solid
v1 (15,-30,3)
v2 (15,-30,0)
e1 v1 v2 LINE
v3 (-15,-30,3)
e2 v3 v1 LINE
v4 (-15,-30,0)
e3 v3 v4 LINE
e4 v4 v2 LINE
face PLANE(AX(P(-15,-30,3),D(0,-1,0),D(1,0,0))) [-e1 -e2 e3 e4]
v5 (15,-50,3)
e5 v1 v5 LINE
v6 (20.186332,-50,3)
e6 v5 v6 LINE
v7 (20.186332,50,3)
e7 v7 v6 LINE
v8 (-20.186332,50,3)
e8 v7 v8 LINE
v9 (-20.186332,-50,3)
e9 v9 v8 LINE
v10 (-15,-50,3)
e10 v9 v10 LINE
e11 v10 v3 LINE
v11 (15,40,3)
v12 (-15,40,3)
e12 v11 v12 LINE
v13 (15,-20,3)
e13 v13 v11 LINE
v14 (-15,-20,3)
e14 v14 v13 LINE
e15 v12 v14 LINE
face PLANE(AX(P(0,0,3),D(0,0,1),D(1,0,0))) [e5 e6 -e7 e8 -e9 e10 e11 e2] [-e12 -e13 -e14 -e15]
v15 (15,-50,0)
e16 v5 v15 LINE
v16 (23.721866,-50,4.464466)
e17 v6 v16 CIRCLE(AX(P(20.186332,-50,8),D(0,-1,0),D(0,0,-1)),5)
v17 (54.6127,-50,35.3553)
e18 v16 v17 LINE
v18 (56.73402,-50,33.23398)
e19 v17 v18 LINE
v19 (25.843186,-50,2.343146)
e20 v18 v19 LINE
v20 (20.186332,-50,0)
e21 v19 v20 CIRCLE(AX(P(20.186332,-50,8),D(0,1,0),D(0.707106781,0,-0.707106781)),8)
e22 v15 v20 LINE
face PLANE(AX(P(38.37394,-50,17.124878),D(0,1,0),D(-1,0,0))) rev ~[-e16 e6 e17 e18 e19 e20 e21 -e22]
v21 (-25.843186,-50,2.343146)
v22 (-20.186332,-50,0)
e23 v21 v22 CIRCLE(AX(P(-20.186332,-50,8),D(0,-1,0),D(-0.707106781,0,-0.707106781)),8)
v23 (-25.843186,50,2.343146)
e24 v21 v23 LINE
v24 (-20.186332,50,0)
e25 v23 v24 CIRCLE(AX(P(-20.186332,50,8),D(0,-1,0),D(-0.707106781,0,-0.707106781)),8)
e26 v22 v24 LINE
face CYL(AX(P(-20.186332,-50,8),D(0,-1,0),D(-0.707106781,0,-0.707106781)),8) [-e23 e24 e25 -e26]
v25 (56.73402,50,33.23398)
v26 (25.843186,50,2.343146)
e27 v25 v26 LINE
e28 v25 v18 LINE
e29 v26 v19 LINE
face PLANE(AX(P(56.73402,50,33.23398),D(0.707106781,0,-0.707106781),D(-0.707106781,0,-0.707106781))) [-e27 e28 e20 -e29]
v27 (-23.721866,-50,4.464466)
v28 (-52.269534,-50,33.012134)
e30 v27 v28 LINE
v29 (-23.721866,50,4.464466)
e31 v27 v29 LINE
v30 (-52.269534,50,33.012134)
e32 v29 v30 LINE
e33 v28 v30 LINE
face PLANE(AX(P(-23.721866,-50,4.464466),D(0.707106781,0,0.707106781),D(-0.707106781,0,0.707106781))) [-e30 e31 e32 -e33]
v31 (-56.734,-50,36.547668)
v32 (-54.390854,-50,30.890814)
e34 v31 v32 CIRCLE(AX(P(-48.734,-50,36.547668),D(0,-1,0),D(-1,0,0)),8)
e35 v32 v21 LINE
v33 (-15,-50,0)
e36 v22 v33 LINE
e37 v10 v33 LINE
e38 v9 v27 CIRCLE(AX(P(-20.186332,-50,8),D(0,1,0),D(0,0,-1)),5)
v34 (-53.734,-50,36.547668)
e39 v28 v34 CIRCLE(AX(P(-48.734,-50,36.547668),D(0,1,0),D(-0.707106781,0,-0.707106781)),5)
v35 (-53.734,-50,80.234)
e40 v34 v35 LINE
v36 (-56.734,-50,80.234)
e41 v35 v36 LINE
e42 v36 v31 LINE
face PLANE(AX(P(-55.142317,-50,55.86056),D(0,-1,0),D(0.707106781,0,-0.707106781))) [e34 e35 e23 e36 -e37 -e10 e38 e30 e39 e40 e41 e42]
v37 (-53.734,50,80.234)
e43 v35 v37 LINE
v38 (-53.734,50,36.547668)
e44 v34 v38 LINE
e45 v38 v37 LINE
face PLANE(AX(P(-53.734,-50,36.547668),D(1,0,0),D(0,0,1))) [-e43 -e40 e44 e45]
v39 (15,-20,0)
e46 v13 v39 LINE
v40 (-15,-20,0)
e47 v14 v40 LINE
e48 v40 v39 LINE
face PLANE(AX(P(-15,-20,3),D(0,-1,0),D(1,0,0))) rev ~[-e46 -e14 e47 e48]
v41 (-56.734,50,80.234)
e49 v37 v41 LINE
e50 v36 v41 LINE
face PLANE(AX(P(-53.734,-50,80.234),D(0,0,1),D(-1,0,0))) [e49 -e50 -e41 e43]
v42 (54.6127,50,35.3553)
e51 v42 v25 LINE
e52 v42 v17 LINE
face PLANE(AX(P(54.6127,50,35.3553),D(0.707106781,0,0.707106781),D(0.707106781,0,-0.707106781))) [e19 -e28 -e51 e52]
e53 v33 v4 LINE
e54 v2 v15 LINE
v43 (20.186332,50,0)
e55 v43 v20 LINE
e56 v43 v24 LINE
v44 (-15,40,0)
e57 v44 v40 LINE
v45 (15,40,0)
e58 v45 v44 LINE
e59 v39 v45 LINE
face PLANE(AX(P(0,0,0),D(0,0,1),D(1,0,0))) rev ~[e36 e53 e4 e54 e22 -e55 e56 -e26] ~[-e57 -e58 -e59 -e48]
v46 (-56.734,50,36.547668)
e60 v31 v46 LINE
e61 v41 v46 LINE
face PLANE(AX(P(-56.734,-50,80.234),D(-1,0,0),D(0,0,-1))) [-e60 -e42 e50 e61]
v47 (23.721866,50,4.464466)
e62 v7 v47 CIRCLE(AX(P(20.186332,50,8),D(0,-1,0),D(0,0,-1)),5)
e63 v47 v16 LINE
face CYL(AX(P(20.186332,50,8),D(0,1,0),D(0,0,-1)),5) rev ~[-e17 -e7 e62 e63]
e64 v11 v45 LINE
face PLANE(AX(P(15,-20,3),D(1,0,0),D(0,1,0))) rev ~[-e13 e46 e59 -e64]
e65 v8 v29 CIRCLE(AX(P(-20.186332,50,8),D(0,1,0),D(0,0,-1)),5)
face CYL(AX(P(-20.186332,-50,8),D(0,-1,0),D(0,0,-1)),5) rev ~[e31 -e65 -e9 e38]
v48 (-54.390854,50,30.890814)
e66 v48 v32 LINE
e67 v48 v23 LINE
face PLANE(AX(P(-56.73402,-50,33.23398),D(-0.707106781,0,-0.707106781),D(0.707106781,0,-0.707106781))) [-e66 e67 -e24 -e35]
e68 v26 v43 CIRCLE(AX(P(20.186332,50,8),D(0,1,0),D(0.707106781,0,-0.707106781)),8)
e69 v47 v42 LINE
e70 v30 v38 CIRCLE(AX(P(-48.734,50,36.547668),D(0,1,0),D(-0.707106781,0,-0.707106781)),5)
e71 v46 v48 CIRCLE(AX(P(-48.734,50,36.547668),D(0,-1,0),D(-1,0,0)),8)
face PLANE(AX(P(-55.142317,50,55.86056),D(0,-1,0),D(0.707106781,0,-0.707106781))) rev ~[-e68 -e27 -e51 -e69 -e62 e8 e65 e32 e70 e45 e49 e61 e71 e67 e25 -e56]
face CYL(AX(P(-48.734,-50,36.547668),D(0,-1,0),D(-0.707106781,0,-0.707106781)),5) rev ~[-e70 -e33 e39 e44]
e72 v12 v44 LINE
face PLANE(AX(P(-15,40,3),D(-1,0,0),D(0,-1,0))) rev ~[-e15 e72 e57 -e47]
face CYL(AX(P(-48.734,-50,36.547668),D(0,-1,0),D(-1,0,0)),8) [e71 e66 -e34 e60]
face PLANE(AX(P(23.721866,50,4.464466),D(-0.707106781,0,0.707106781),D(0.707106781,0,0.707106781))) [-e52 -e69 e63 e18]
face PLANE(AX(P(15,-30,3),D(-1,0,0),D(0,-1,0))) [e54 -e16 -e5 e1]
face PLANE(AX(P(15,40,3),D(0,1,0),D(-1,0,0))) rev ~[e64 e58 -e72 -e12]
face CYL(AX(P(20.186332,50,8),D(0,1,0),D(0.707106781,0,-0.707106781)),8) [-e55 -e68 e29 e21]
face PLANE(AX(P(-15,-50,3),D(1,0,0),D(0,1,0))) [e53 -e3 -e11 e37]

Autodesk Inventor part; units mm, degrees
ref_plane "YZ Plane" through (0, 0, 0) normal (1, 0, 0) x (0, 1, 0)
ref_plane "XZ Plane" through (0, 0, 0) normal (0, 1, 0) x (-1, 0, 0)
ref_plane "XY Plane" through (0, 0, 0) normal (0, 0, 1) x (1, 0, 0)
sketch "Sketch1" plane through (0, 0, 0) normal (0, 0, 1) x (1, 0, 0)
  line L0 (-23.5, -50) -> (23.5, -50)
  line L1 (23.5, -50) -> (23.5, 50)
  line L2 (23.5, 50) -> (-23.5, 50)
  line L3 (-23.5, 50) -> (-23.5, -50)
  line L4 (-23.5, -50) -> (23.5, 50) construction
  line L5 (23.5, -50) -> (-23.5, 50) construction
  point P0 (0, 0)
  dimension "d154" = 47
  dimension "d155" = 100
extrude "Plate3" add sketch "Sketch1" along normal blind 3
sketch "Sketch7" plane through (21.3787, 50, 2.1213) normal (0.7071068, 0, -0.7071068) x (0, 1, 0)
  line L0 (-100, 0) -> (0, 0)
  line L1 (0, 0) -> (0, 47)
  line L2 (0, 47) -> (-100, 47)
  line L3 (-100, 47) -> (-100, 0)
edge flange "Flange3" height 47 angle 45 thickness 3 bend radius 5 thickness toward (0.7071068, 0, -0.7071068) relief round relief width 3 relief depth 1.5 corner gap 5 corner form 0 edges at (23.5, 0, 3) (-23.5, 0, 3) wall of the first edge with corners at (21.3787, -50, 2.1213) (21.3787, 50, 2.1213) (54.6127, 50, 35.3553) (54.6127, -50, 35.3553)
bend "Bend3"
corner "Corner3"
sketch "Sketch8" plane through (0, 0, 3) normal (0, 0, 1) x (1, 0, 0)
  line L0 (15, 40) -> (-15, 40)
  line L1 (-15, 40) -> (-15, -20)
  line L2 (-15, -20) -> (15, -20)
  line L3 (15, -20) -> (15, 40)
  line L4 (15, 40) -> (-15, -20) construction
  line L5 (-15, 40) -> (15, -20) construction
  line L6 (-23.5, 50) -> (20.1863, 50) projected
  line L7 (-20.1863, -50) -> (20.1863, -50) projected
  line L8 (15, -50) -> (-15, -50)
  line L9 (-15, -50) -> (-15, -30)
  line L10 (-15, -30) -> (15, -30)
  line L11 (15, -30) -> (15, -50)
  point P0 (0, 0)
  point P1 (0, 10)
  point P2 (-15, -50)
  dimension "d166" = 30
  dimension "d168" = 10
  dimension "d182" = 10
  dimension "d183" = 20
extrude "Cut1" cut sketch "Sketch8" against normal blind 3
sketch "Sketch9" plane through (-53.734, -50, 33.234) normal (-1, 0, 0) x (0, -1, 0)
  line L0 (-100, 0) -> (0, 0)
  line L1 (0, 0) -> (0, 47)
  line L2 (0, 47) -> (-100, 47)
  line L3 (-100, 47) -> (-100, 0)
edge flange "Flange4" height 47 angle 45 thickness 3 bend radius 5 thickness toward (-1, 0, 0) relief round relief width 3 relief depth 1.5 edges at (-54.6127, 0, 35.3553) wall of the first edge with corners at (-53.734, 50, 33.234) (-53.734, -50, 33.234) (-53.734, -50, 80.234) (-53.734, 50, 80.234)
bend "Bend4"
corner "Corner4"
properties part number "DSB-101 Axis" material "Stainless Steel"
